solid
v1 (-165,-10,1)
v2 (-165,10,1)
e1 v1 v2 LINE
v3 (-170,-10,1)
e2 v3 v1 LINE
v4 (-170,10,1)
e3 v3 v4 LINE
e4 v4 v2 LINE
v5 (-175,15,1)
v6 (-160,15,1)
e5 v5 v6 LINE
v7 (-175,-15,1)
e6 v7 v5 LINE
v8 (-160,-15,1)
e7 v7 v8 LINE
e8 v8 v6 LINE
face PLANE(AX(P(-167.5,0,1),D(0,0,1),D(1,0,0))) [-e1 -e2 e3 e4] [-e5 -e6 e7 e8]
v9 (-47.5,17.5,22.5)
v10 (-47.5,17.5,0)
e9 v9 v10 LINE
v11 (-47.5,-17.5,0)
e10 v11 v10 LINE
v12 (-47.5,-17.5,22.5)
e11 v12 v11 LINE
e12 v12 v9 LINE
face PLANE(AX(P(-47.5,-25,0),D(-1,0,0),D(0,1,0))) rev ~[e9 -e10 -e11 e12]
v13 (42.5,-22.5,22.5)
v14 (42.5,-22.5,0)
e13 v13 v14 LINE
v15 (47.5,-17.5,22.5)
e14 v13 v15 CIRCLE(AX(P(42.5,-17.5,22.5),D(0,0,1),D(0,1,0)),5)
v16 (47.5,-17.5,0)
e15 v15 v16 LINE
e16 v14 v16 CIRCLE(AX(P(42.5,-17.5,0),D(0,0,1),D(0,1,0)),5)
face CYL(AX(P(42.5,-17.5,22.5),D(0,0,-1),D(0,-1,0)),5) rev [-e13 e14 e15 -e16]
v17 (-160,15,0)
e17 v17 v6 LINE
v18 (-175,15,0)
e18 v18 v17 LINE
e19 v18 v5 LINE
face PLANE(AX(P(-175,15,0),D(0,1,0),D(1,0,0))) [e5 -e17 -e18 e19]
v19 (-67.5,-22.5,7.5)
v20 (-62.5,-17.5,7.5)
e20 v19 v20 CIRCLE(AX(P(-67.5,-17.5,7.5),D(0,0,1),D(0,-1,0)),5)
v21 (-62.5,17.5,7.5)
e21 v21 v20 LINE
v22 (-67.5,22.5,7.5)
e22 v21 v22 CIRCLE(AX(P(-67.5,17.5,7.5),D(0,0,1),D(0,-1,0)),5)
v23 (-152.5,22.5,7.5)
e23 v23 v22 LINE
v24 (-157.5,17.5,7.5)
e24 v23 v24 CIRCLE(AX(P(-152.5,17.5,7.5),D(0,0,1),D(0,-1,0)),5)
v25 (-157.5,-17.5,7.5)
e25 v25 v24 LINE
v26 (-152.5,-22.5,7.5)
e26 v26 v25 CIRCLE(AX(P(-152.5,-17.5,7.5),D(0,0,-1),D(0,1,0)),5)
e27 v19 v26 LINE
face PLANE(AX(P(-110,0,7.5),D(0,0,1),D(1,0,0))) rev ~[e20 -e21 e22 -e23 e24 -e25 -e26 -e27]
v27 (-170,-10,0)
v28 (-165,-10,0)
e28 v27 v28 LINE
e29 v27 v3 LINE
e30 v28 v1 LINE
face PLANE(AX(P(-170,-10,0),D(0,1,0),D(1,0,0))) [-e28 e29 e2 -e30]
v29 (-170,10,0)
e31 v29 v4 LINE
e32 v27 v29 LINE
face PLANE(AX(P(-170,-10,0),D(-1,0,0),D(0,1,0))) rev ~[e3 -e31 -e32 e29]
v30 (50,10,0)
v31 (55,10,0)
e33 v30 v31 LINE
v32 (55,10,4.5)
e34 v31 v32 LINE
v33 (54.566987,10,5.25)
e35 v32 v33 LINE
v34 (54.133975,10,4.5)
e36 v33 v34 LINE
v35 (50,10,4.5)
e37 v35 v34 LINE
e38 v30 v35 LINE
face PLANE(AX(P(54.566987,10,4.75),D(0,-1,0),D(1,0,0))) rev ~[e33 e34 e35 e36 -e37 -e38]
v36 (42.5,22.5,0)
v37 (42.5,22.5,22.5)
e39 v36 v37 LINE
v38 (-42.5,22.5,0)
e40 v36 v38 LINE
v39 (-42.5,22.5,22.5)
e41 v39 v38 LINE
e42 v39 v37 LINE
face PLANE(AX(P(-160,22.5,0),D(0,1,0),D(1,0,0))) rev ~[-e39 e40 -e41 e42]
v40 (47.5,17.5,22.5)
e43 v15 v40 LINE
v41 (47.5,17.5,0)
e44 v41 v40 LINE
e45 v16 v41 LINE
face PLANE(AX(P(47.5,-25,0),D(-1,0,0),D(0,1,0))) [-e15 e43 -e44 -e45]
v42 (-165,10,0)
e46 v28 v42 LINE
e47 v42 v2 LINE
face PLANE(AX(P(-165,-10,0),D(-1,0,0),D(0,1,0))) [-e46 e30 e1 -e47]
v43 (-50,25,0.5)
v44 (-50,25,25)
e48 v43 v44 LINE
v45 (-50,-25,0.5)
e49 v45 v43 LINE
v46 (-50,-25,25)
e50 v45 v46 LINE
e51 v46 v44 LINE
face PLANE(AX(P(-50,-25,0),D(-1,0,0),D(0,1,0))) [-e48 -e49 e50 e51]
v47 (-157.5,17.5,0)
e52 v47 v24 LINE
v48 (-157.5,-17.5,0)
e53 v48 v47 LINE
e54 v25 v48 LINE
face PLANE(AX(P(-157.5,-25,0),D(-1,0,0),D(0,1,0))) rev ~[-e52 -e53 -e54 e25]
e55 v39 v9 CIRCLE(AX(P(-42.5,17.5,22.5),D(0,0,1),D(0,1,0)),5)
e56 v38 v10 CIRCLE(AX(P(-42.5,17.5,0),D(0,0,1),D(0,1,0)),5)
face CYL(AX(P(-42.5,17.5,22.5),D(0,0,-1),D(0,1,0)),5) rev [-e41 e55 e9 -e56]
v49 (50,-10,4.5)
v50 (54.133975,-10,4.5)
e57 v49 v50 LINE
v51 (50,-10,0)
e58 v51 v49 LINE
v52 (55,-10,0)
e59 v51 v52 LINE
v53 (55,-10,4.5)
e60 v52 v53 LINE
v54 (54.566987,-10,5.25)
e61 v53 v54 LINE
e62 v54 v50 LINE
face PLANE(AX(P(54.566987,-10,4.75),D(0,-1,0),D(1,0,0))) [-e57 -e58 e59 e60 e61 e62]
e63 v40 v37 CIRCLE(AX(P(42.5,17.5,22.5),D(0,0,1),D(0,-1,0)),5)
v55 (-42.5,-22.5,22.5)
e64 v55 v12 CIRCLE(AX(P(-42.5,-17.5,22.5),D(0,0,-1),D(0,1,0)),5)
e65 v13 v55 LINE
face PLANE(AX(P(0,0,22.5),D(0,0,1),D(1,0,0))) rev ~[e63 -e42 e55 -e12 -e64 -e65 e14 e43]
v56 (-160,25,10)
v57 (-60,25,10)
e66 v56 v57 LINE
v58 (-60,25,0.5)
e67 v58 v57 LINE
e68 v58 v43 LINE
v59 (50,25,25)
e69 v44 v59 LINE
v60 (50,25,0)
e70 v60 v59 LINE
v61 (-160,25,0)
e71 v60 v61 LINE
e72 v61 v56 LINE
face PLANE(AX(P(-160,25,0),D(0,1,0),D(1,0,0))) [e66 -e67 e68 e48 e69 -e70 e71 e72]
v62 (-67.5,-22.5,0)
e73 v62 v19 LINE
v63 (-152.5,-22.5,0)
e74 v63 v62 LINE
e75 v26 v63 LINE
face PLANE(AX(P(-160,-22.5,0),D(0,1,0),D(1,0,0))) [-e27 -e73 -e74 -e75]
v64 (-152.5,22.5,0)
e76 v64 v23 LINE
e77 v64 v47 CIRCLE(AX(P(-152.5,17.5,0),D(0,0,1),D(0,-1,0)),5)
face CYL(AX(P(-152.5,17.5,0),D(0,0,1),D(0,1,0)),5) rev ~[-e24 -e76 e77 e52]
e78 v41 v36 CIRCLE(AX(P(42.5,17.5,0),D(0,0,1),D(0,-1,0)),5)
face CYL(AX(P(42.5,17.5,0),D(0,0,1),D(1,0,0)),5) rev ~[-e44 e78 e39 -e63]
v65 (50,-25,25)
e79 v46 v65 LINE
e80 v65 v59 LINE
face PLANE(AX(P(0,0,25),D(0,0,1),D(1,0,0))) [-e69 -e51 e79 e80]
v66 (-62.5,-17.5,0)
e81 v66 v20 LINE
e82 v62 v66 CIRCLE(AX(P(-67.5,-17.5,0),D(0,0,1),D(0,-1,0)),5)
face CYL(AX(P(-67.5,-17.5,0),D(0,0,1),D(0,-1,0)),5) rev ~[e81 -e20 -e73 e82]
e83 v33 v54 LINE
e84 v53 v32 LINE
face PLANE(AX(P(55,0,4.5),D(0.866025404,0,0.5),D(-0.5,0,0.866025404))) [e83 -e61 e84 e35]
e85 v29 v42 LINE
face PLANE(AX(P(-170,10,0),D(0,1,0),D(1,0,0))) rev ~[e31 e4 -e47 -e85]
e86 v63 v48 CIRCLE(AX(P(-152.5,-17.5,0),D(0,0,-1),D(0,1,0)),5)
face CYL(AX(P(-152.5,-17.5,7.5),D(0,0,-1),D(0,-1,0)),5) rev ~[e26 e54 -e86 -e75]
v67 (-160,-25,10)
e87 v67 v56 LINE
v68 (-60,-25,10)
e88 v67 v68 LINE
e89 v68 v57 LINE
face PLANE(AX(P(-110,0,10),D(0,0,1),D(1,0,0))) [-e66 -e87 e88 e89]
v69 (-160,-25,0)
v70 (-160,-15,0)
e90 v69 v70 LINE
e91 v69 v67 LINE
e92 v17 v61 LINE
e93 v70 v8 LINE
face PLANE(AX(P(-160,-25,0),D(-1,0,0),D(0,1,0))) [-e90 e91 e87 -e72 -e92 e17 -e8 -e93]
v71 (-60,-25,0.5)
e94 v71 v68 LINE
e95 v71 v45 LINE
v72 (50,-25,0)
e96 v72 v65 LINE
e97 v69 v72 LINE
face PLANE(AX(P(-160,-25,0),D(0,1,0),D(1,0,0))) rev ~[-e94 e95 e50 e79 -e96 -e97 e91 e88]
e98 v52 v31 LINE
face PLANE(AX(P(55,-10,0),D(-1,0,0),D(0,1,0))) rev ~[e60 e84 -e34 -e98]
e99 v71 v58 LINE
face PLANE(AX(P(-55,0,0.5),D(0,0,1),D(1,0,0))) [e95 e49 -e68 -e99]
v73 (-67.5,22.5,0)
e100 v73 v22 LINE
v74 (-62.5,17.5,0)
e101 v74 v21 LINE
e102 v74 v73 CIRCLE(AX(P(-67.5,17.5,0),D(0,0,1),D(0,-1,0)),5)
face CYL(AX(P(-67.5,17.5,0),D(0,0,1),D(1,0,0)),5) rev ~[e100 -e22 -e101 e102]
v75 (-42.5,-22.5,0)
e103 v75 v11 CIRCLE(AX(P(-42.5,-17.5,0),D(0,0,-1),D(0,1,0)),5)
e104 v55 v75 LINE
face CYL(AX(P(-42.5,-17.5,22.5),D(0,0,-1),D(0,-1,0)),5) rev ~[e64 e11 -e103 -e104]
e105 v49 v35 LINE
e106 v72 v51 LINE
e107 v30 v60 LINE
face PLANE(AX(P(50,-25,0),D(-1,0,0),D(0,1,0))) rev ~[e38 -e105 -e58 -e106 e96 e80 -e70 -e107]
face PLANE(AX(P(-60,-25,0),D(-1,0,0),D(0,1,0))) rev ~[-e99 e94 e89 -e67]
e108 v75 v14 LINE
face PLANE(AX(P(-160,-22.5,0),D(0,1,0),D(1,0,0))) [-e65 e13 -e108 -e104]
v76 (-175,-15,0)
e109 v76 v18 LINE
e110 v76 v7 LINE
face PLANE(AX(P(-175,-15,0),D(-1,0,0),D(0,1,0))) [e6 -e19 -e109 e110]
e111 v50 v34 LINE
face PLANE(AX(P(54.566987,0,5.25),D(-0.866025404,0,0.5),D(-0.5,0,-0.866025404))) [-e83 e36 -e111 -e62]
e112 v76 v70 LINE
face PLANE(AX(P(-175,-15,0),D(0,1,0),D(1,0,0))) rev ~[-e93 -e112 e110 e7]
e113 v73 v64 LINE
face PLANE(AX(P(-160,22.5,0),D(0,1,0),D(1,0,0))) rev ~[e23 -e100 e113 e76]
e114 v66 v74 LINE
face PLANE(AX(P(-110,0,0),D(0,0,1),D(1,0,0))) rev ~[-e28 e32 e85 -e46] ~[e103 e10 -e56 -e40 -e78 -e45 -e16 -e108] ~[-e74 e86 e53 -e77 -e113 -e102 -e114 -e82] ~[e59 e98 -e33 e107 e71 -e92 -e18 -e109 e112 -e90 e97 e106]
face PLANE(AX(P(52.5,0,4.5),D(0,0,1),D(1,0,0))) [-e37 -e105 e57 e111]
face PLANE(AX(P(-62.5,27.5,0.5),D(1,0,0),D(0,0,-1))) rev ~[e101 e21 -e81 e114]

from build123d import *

# Parameters (mm, degrees)
F0_W        = 100
F0_H        = 50
F1_DEPTH    = 25
F2_W        = 10
F2_H        = 50
F3_DEPTH    = 0.5
F4_W        = 100
F4_H        = 50
F5_DEPTH    = 10
F6_T        = 2.5
F6_T3_DEPTH = 55
F7_R        = 5
F8_W        = 5
F8_H        = 20
F9_DEPTH    = 4.5
F10_W       = 15
F10_H       = 30
F10_W_2     = 5
F10_H_2     = 20
F11_DEPTH   = 1
F13_DEPTH   = 10


# Not quite as in the source:
# - a shell that OpenCascade refuses in one call is made with other operations: the cavity is built on its own and cut out


with BuildPart() as f1:
    # F0 (on Top) → F1 (new body)
    with BuildSketch(Plane.XY):
        Rectangle(F0_W, F0_H)
    extrude(amount=F1_DEPTH)

    # F2 (on Top) → F3 (join)
    with BuildSketch(Plane.XY):
        with Locations((-55, 0)):
            Rectangle(F2_W, F2_H)
    extrude(amount=F3_DEPTH)

    # F4 (on Top) → F5 (join)
    with BuildSketch(Plane.XY):
        with Locations((-110, 0)):
            Rectangle(F4_W, F4_H)
    extrude(amount=F5_DEPTH)

    # F6: shell of thickness 2.5, made by hand


with BuildPart() as f6_core1:
    # F6_t2: copy of F1
    add(f1.part)

    # the walls: a layer under each face that stays
    f6_faces = [f6_core1.faces().sort_by_distance(p)[0] for p in [
        (-50, 0, 12.75),
        (15, 25, 20.8333333333),
        (-160, 0, 5),
        (-110, 0, 10),
        (-60, 0, 5.25),
        (50, 0, 12.5),
        (0, 0, 25),
        (-125, -25, 4.1666666667),
        (-55, 0, 0.5),
    ]]
    thicken(f6_faces, amount=-F6_T, mode=Mode.SUBTRACT)

    # F6_s4 → F6_t3 (cut)
    with BuildSketch(Plane.XZ.offset(-27.5)):
        Polygon((-50.025, 0.525), (-47.5, 0.5), (-47.5, -2), (-50, -2), align=None)
        Polygon((-59.975, 0.525), (-62.5, 0.5), (-62.5, -2), (-60, -2), align=None)
    extrude(amount=F6_T3_DEPTH, mode=Mode.SUBTRACT)


with BuildPart() as f1_1:
    add(f1.part)

    # what is left inside the walls is the cavity
    f6_cavity = [f6_core1.part.solids().sort_by_distance(p)[0] for p in [
        (0, -7.5, 22.475),
        (-110, -7.5, 7.475),
    ]]
    add(f6_cavity, mode=Mode.SUBTRACT)

    # F7
    f7_edges = [f1_1.edges().sort_by_distance(p)[0] for p in [
        (-157.5, -22.5, 3.75),
        (-62.5, -22.5, 3.75),
        (-62.5, 22.5, 3.75),
        (-157.5, 22.5, 3.75),
        (-47.5, -22.5, 11.25),
        (47.5, -22.5, 11.25),
        (47.5, 22.5, 11.25),
        (-47.5, 22.5, 11.25),
    ]]
    fillet(f7_edges, radius=F7_R)

    # F8 (on Top) → F9 (join)
    with BuildSketch(Plane.XY):
        with Locations((52.5, 0)):
            Rectangle(F8_W, F8_H)
    extrude(amount=F9_DEPTH)

    # F10 (on Top) → F11 (join)
    with BuildSketch(Plane.XY):
        with Locations((-167.5, 0)):
            Rectangle(F10_W, F10_H)
        with Locations((-167.5, 0)):
            Rectangle(F10_W_2, F10_H_2, mode=Mode.SUBTRACT)
    extrude(amount=F11_DEPTH)

    # F12 (on Front) → F13 (join, symmetric)
    with BuildSketch(Plane.XZ):
        Polygon((55, 4.5), (54.5669872981, 5.25), (54.1339745962, 4.5), align=None)
    extrude(amount=F13_DEPTH, both=True)


solid = f1_1.part
